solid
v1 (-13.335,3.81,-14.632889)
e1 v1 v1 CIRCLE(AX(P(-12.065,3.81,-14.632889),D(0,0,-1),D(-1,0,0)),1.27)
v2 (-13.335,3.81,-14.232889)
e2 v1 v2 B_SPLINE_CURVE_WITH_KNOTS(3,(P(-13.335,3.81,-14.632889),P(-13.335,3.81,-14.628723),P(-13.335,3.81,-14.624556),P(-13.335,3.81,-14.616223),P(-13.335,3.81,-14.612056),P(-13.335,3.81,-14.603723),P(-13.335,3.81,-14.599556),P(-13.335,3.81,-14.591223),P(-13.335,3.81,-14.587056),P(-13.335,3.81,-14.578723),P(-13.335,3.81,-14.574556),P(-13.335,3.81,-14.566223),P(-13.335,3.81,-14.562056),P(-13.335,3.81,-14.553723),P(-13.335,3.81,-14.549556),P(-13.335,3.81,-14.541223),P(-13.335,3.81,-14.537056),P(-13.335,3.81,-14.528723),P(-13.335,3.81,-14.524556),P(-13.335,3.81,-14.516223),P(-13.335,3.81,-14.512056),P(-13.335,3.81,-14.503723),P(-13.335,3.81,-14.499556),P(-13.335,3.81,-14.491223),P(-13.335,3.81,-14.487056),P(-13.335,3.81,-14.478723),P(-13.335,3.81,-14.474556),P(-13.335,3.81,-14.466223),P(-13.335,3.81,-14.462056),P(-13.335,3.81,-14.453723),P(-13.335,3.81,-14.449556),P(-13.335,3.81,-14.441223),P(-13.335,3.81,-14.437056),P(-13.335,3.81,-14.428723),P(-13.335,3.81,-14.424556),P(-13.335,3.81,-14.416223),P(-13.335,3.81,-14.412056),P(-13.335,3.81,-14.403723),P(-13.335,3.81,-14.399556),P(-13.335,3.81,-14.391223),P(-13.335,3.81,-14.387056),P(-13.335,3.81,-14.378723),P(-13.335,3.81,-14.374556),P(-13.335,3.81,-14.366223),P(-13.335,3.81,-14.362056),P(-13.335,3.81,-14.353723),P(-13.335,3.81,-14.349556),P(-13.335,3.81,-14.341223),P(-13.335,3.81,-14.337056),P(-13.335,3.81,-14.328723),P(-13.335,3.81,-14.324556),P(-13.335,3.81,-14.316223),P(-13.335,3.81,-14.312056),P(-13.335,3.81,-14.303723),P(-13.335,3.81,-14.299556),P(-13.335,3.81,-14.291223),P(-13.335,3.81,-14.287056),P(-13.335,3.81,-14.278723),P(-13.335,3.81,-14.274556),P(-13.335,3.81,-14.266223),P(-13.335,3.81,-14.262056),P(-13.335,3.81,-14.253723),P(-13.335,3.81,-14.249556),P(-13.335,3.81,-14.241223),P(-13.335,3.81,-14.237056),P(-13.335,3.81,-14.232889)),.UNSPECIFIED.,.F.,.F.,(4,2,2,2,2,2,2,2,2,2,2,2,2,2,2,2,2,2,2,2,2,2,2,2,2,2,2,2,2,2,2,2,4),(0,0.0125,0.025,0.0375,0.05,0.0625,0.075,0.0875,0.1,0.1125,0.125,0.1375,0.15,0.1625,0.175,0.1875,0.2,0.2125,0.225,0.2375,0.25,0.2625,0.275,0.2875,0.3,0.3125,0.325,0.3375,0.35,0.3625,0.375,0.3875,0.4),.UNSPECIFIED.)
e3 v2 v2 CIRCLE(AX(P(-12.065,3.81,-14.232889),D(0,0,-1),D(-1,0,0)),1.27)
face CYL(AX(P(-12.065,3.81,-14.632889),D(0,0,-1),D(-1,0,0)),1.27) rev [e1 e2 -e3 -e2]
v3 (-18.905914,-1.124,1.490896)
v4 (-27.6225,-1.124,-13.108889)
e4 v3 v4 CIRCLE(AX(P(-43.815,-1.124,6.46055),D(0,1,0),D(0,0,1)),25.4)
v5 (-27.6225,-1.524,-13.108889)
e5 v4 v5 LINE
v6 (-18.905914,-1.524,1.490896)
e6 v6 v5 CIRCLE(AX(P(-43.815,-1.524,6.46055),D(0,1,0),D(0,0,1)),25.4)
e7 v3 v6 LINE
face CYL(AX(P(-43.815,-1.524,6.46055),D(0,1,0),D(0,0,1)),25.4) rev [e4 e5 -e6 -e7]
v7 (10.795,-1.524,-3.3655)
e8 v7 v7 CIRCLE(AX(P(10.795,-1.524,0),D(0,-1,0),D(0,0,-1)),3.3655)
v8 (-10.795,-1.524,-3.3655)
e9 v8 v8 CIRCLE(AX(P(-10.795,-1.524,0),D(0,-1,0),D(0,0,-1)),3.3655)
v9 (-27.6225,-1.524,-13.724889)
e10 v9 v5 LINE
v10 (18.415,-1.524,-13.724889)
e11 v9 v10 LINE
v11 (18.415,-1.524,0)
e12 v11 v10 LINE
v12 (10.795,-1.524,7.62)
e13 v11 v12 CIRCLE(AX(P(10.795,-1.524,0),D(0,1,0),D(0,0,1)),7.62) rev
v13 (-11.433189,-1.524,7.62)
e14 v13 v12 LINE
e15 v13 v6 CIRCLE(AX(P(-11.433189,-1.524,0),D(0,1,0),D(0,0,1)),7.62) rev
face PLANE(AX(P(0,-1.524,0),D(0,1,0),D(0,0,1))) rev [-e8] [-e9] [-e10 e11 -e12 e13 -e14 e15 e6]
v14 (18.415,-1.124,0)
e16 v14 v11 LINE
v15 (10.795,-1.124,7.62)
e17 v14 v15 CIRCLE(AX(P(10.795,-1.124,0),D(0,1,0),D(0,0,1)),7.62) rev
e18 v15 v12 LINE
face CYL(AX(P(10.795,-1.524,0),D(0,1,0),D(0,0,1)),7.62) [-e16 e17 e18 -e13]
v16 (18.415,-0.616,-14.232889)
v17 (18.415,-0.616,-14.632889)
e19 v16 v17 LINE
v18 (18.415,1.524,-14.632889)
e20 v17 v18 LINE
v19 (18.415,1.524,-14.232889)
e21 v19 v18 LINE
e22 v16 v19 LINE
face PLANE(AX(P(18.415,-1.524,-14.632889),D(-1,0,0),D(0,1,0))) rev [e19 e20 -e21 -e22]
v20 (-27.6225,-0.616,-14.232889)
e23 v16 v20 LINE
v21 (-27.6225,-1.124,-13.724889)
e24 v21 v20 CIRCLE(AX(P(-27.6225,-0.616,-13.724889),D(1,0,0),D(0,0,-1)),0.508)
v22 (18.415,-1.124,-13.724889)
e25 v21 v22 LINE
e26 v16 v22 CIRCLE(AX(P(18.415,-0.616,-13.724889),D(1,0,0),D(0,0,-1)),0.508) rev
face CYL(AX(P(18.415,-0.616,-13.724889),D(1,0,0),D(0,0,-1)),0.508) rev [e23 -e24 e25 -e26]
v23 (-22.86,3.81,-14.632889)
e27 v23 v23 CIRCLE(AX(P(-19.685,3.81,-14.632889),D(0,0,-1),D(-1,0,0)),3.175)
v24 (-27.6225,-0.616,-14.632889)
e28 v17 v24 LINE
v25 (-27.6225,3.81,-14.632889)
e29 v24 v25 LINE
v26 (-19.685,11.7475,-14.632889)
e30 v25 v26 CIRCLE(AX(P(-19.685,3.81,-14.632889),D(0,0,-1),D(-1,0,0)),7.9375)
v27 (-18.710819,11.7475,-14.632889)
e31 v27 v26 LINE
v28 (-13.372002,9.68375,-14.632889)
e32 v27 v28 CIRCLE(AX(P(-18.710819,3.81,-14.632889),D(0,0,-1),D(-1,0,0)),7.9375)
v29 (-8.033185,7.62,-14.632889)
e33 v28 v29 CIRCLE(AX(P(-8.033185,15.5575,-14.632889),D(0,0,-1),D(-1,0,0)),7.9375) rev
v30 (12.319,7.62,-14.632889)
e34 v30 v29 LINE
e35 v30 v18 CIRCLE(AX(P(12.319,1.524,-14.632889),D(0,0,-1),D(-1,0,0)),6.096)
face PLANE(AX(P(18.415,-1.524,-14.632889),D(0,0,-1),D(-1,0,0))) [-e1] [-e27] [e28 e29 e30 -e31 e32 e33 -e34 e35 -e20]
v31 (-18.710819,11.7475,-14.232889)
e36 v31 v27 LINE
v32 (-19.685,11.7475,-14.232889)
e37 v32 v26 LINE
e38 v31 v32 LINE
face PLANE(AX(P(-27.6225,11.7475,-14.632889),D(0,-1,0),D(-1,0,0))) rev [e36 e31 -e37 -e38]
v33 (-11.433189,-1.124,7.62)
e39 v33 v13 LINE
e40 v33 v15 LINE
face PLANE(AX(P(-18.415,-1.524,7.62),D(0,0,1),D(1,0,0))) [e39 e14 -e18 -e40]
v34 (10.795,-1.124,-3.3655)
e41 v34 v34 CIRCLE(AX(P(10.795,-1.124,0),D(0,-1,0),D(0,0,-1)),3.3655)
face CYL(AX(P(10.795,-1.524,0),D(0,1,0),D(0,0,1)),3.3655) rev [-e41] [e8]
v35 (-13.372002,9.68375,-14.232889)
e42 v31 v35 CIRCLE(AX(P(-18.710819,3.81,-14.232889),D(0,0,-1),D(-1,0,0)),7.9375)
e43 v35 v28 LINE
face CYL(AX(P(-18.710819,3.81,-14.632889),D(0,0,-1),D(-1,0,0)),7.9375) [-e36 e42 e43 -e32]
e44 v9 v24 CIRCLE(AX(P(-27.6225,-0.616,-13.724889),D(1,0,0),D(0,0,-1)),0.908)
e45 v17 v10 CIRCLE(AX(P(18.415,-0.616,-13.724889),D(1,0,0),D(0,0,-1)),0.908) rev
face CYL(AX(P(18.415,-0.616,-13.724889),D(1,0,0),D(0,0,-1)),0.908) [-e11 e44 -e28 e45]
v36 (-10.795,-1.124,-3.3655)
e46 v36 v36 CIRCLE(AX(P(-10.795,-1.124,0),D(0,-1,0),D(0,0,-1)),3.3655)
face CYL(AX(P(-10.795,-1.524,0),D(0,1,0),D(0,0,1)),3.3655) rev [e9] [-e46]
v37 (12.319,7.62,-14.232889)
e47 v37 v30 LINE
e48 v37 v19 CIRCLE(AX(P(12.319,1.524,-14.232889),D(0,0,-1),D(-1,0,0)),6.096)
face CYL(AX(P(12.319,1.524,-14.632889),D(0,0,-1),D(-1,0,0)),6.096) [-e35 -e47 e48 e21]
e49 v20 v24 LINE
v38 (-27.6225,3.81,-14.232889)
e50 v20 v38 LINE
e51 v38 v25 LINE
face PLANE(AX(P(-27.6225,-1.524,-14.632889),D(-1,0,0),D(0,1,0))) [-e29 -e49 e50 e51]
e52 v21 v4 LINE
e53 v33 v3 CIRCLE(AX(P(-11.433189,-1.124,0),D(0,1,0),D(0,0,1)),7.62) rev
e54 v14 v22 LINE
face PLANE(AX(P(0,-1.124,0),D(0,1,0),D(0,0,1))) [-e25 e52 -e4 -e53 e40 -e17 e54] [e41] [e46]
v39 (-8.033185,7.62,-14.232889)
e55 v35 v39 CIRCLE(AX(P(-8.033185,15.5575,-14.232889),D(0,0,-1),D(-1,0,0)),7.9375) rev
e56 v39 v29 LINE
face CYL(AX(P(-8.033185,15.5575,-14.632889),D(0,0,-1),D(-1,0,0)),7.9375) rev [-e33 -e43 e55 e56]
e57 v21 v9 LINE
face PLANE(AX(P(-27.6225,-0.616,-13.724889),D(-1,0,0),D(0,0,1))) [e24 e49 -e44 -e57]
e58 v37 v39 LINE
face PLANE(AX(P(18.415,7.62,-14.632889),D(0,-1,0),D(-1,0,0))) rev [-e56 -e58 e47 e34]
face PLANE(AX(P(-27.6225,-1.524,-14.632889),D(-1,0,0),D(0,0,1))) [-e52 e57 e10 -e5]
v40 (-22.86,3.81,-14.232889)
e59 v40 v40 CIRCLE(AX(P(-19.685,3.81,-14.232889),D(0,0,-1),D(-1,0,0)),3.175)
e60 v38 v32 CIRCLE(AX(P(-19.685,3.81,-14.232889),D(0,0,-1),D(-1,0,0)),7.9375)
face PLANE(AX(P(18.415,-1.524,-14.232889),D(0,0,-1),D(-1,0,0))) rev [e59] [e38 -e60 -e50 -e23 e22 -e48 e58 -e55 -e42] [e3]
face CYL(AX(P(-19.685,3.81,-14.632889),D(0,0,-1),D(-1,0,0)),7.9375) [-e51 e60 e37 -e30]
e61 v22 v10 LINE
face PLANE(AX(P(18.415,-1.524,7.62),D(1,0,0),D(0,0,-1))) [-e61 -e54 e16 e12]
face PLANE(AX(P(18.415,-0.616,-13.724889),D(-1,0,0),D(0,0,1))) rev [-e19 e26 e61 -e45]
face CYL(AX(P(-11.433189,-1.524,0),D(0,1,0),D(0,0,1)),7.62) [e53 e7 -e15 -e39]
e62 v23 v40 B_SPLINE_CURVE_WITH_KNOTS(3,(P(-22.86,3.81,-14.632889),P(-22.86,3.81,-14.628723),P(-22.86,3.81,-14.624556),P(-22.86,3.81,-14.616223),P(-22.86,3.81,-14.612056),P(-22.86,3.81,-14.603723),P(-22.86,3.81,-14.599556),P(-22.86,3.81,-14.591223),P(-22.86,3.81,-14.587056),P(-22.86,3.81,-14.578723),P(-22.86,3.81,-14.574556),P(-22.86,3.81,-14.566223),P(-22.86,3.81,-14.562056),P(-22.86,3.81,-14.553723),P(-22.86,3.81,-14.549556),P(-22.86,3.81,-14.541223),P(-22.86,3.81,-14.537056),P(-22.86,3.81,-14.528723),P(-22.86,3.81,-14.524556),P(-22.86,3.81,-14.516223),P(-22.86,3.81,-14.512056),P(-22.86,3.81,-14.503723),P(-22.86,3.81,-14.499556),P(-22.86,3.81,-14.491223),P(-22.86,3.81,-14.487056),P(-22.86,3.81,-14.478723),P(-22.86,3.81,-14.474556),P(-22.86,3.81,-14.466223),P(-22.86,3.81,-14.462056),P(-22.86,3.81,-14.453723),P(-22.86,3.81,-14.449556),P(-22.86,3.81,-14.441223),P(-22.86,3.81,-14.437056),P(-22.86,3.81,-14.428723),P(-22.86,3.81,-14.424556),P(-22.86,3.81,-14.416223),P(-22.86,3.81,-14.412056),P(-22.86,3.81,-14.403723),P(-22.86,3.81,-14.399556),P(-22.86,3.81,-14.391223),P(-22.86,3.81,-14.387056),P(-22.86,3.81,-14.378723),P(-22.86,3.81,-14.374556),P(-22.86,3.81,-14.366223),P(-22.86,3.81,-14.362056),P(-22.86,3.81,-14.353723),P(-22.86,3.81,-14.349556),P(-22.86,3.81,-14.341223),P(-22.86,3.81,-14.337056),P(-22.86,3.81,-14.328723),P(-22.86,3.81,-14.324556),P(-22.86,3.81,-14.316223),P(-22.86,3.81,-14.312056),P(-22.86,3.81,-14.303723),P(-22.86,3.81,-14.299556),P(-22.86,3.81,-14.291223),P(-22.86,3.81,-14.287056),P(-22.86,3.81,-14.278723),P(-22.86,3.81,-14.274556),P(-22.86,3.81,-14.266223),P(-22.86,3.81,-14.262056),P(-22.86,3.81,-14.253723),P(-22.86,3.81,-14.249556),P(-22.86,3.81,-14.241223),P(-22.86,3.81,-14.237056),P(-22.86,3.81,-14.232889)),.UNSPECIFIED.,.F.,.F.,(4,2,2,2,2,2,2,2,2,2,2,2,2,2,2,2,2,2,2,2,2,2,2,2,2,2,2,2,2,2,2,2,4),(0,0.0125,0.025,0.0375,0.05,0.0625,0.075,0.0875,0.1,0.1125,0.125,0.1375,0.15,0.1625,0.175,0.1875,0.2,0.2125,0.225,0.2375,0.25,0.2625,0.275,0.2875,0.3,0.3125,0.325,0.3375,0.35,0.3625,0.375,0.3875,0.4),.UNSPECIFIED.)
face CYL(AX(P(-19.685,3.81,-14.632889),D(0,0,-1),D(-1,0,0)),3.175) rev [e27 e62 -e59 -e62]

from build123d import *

# Parameters (mm, degrees)
SKETCH1_R                    = 3.3655
BOSS_EXTRUDE1_DEPTH          = 1.524
SKETCH2_R                    = 3.3655
CUT_EXTRUDE1_DEPTH           = 1.524
CUT_EXTRUDE1_DRAFT           = 46
CUT_EXTRUDE1_PROFILE_2_DEPTH = 1.524
CUT_EXTRUDE1_PROFILE_2_DRAFT = 46
FILLET1_R                    = 25.4
SKETCH3_W                    = 15.875
SKETCH3_H                    = 1.524
BOSS_EXTRUDE2_DEPTH          = 11.7475
FILLET3_R                    = 7.9375
SKETCH5_W                    = 30.1625
SKETCH5_H                    = 1.524
BOSS_EXTRUDE3_DEPTH          = 7.62
SKETCH4_R                    = 3.175
SKETCH4_R_2                  = 1.27
CUT_EXTRUDE2_DEPTH           = 19.05
FILLET7_R                    = 7.62
FILLET10_R                   = 6.096
FILLET13_R                   = 7.9375
FILLET14_R                   = 7.9375
CONVERT_SOLID1_START         = -0.62672976
CONVERT_SOLID1_OUTLINE_R     = 3.3655
CONVERT_SOLID1_DEPTH         = 12.37422976
CONVERT_SOLID1_START_2       = -1.124
CONVERT_SOLID1_2_OUTLINE_R   = 3.3655
CONVERT_SOLID1_2_DEPTH       = 0.508
CONVERT_SOLID1_START_3       = -1.524
CONVERT_SOLID1_3_OUTLINE_R   = 3.3655
CONVERT_SOLID1_3_DEPTH       = 0.4
CONVERT_SOLID1_START_4       = -27.6225
CONVERT_SOLID1_4_DEPTH       = 46.0375


with BuildPart() as part:
    # Sketch1 → Boss-Extrude1 (new body)
    with BuildSketch(Plane(origin=(0, 0, 0), x_dir=(1, 0, 0), z_dir=(0, 1, 0))):
        Polygon((-27.6225, 14.6328892), (-27.6225, 13.1088892), (-18.415, 6.7588892), (-18.415, -7.62), (18.415, -7.62), (18.415, 14.6328892), align=None)
        with Locations(Location((-10.795, 0, 0), (0, 0, 270))):
            Circle(SKETCH1_R, mode=Mode.SUBTRACT)
        with Locations(Location((10.795, 0, 0), (0, 0, 270))):
            Circle(SKETCH1_R, mode=Mode.SUBTRACT)
    extrude(amount=-BOSS_EXTRUDE1_DEPTH)


with BuildPart() as cut_extrude1_tool:
    # Sketch2 → Cut-Extrude1 (with draft: the straight prism first)
    with BuildSketch(Plane.XZ.offset(1.524)):
        with Locations((-10.795, 0)):
            Circle(SKETCH2_R)
    extrude(amount=-CUT_EXTRUDE1_DEPTH)
    # Cut-Extrude1: the draft: its side faces are tilted about the plane it starts from
    cut_extrude1_sides = [cut_extrude1_tool.faces().sort_by_distance(p)[0] for p in [
        (-14.1605, -0.762, 0),
    ]]
    draft(cut_extrude1_sides, Plane.XZ.offset(1.524), CUT_EXTRUDE1_DRAFT)


with BuildPart() as part_1:
    add(part.part)

    # Cut-Extrude1: cut by cut_extrude1_tool
    add(cut_extrude1_tool.part, mode=Mode.SUBTRACT)


with BuildPart() as cut_extrude1_profile_2_tool:
    # Sketch2 → Cut-Extrude1 profile 2 (with draft: the straight prism first)
    with BuildSketch(Plane.XZ.offset(1.524)):
        with Locations((10.795, 0)):
            Circle(SKETCH2_R)
    extrude(amount=-CUT_EXTRUDE1_PROFILE_2_DEPTH)
    # Cut-Extrude1 profile 2: the draft: its side faces are tilted about the plane it starts from
    cut_extrude1_profile_2_sides = [cut_extrude1_profile_2_tool.faces().sort_by_distance(p)[0] for p in [
        (7.4295, -0.762, 0),
    ]]
    draft(cut_extrude1_profile_2_sides, Plane.XZ.offset(1.524), CUT_EXTRUDE1_PROFILE_2_DRAFT)


with BuildPart() as part_2:
    add(part_1.part)

    # Cut-Extrude1 profile 2: cut by cut_extrude1_profile_2_tool
    add(cut_extrude1_profile_2_tool.part, mode=Mode.SUBTRACT)

    # Fillet1
    # the kernel refuses this fillet: 25.4 mm, written as the material it adds along each edge
    with BuildSketch(Plane(origin=(-18.415, 0, -6.7588892), x_dir=(0, 0, 1), z_dir=(0, -1, 0))) as fillet1_piece_1:
        with BuildLine():
            CenterArc((13.219439025, 25.4), FILLET1_R, 219.605652394, 50.394347606)
            Line((-6.35, 9.2075), (-6.74138878, 8.88365))
            ThreePointArc((-6.74138878, 8.88365), (-3.593192095, 4.315341658), (-0.418192095, -0.288408342))
            Line((-0.418192095, -0.288408342), (0, -0.508))
            Line((0, -0.508), (13.219439025, -0.508))
            Line((13.219439025, -0.508), (13.219439025, 0))
        make_face()
    extrude(amount=1.524)

    # Sketch3 → Boss-Extrude2 (add)
    with BuildSketch(Plane(origin=(0, 0, 0), x_dir=(1, 0, 0), z_dir=(0, 1, 0))):
        with Locations((-19.685, 13.8708892)):
            Rectangle(SKETCH3_W, SKETCH3_H)
    extrude(amount=BOSS_EXTRUDE2_DEPTH)

    # Fillet3
    fillet3_edges = [part_2.edges().sort_by_distance(p)[0] for p in [
        (-27.6225, 11.7475, -13.8708892),
    ]]
    fillet(fillet3_edges, radius=FILLET3_R)

    # Sketch5 → Boss-Extrude3 (add)
    with BuildSketch(Plane(origin=(0, 0, 0), x_dir=(1, 0, 0), z_dir=(0, 1, 0))):
        with Locations((3.33375, 13.8708892)):
            Rectangle(SKETCH5_W, SKETCH5_H)
    extrude(amount=BOSS_EXTRUDE3_DEPTH)

    # Sketch4 → Cut-Extrude2 (cut)
    with BuildSketch(Plane.XY.offset(-13.1088892)):
        with Locations((-19.685, 3.81)):
            Circle(SKETCH4_R)
        with Locations((-12.065, 3.81)):
            Circle(SKETCH4_R_2)
    extrude(amount=-CUT_EXTRUDE2_DEPTH, mode=Mode.SUBTRACT)

    # Fillet7
    fillet7_edges = [part_2.edges().sort_by_distance(p)[0] for p in [
        (18.415, -0.762, 7.62),
        (-18.415, -0.762, 7.62),
    ]]
    fillet(fillet7_edges, radius=FILLET7_R)

    # Fillet10
    fillet10_edges = [part_2.edges().sort_by_distance(p)[0] for p in [
        (18.415, 7.62, -13.8708892),
    ]]
    fillet(fillet10_edges, radius=FILLET10_R)

    # Fillet13
    # the kernel refuses this fillet: 7.9375 mm, written as the material it takes off along each edge
    with BuildSketch(Plane(origin=(-11.7475, 11.7475, -32.041185758), x_dir=(0, -1, 0), z_dir=(0, 0, 1))) as fillet13_piece_1:
        with BuildLine():
            CenterArc((7.9375, -6.963318623), FILLET13_R, 118.685402014, 61.314597986)
            Line((0, -6.963318623), (-0.15875, -6.963318623))
            Line((-0.15875, -6.963318623), (-0.15875, 0))
            Line((-0.15875, 0), (0, 0.15875))
            ThreePointArc((0, 0.15875), (2.06375, 0.15875), (4.0513, 0.139266372))
            Line((4.0513, 0.139266372), (4.1275, 0))
        make_face()
    extrude(amount=36.340593117, mode=Mode.SUBTRACT)

    # Fillet14
    fillet14_edges = [part_2.edges().sort_by_distance(p)[0] for p in [
        (-11.7475, 7.62, -13.8708892),
    ]]
    fillet(fillet14_edges, radius=FILLET14_R)

    # Convert-Solid1: read off the stored shape, not the designer's step
    # Convert-Solid1 outline → Convert-Solid1 (cut)
    with BuildSketch(Plane(origin=(0, 0, 0), x_dir=(1, 0, 0), z_dir=(0, 1, 0)).offset(CONVERT_SOLID1_START)):
        with BuildLine():
            Line((18.415, 14.2328892), (-27.6225, 14.2328892))
            Line((-27.6225, 14.2328892), (-27.6225, 13.1088892))
            ThreePointArc((-27.6225, 13.1088892), (-22.006205533, 6.560067822), (-18.905914469, -1.490896113))
            ThreePointArc((-18.905914469, -1.490896113), (-16.265567707, -5.891732699), (-11.43318881, -7.62))
            Line((-11.43318881, -7.62), (10.795, -7.62))
            ThreePointArc((10.795, -7.62), (16.183153673, -5.388153673), (18.415, 0))
            Line((18.415, 0), (18.415, 14.2328892))
        make_face()
        with Locations((10.795, 0)):
            Circle(CONVERT_SOLID1_OUTLINE_R, mode=Mode.SUBTRACT)
        with Locations((-10.795, 0)):
            Circle(CONVERT_SOLID1_OUTLINE_R, mode=Mode.SUBTRACT)
    extrude(amount=CONVERT_SOLID1_DEPTH, mode=Mode.SUBTRACT)

    # Convert-Solid1 2 outline → Convert-Solid1 2 (cut)
    with BuildSketch(Plane(origin=(0, 0, 0), x_dir=(1, 0, 0), z_dir=(0, 1, 0)).offset(CONVERT_SOLID1_START_2)):
        with BuildLine():
            Line((18.415, 0), (18.415, 13.1088892))
            Line((18.415, 13.1088892), (-27.6225, 13.1088892))
            ThreePointArc((-27.6225, 13.1088892), (-22.006205533, 6.560067822), (-18.905914469, -1.490896113))
            ThreePointArc((-18.905914469, -1.490896113), (-16.265567707, -5.891732699), (-11.43318881, -7.62))
            Line((-11.43318881, -7.62), (10.795, -7.62))
            ThreePointArc((10.795, -7.62), (16.183153673, -5.388153673), (18.415, 0))
        make_face()
        with Locations((-10.795, 0)):
            Circle(CONVERT_SOLID1_2_OUTLINE_R, mode=Mode.SUBTRACT)
        with Locations((10.795, 0)):
            Circle(CONVERT_SOLID1_2_OUTLINE_R, mode=Mode.SUBTRACT)
    extrude(amount=CONVERT_SOLID1_2_DEPTH, mode=Mode.SUBTRACT)

    # Convert-Solid1 3 outline → Convert-Solid1 3 (add)
    with BuildSketch(Plane(origin=(0, 0, 0), x_dir=(1, 0, 0), z_dir=(0, 1, 0)).offset(CONVERT_SOLID1_START_3)):
        with BuildLine():
            Line((18.415, 0), (18.415, 13.1088892))
            Line((18.415, 13.1088892), (-27.6225, 13.1088892))
            ThreePointArc((-27.6225, 13.1088892), (-22.006205533, 6.560067822), (-18.905914469, -1.490896113))
            ThreePointArc((-18.905914469, -1.490896113), (-16.265567707, -5.891732699), (-11.43318881, -7.62))
            Line((-11.43318881, -7.62), (10.795, -7.62))
            ThreePointArc((10.795, -7.62), (16.183153673, -5.388153673), (18.415, 0))
        make_face()
        with Locations((-10.795, 0)):
            Circle(CONVERT_SOLID1_3_OUTLINE_R, mode=Mode.SUBTRACT)
        with Locations((10.795, 0)):
            Circle(CONVERT_SOLID1_3_OUTLINE_R, mode=Mode.SUBTRACT)
    extrude(amount=CONVERT_SOLID1_3_DEPTH)

    # Convert-Solid1 4 outline → Convert-Solid1 4 (cut)
    with BuildSketch(Plane.YZ.offset(CONVERT_SOLID1_START_4)):
        with BuildLine():
            ThreePointArc((-0.62672976, -14.632825801), (-1.261835359, -14.36313734), (-1.524, -13.7248892))
            Line((-1.524, -13.7248892), (-1.524000001, -13.1088892))
            Line((-1.524000001, -13.1088892), (-3, -13.1088892))
            Line((-3, -13.1088892), (-3, -16))
            Line((-3, -16), (-0.62672976, -16))
            Line((-0.62672976, -16), (-0.62672976, -14.632825801))
        make_face()
        with BuildLine():
            Line((-0.62672976, -13.1088892), (-1.124, -13.1088892))
            Line((-1.124, -13.1088892), (-1.124, -13.7248892))
            ThreePointArc((-1.124, -13.7248892), (-0.978983965, -14.080285656), (-0.62672976, -14.232775873))
            Line((-0.62672976, -14.232775873), (-0.62672976, -13.1088892))
        make_face()
    extrude(amount=CONVERT_SOLID1_4_DEPTH, mode=Mode.SUBTRACT)


solid = part_2.part
